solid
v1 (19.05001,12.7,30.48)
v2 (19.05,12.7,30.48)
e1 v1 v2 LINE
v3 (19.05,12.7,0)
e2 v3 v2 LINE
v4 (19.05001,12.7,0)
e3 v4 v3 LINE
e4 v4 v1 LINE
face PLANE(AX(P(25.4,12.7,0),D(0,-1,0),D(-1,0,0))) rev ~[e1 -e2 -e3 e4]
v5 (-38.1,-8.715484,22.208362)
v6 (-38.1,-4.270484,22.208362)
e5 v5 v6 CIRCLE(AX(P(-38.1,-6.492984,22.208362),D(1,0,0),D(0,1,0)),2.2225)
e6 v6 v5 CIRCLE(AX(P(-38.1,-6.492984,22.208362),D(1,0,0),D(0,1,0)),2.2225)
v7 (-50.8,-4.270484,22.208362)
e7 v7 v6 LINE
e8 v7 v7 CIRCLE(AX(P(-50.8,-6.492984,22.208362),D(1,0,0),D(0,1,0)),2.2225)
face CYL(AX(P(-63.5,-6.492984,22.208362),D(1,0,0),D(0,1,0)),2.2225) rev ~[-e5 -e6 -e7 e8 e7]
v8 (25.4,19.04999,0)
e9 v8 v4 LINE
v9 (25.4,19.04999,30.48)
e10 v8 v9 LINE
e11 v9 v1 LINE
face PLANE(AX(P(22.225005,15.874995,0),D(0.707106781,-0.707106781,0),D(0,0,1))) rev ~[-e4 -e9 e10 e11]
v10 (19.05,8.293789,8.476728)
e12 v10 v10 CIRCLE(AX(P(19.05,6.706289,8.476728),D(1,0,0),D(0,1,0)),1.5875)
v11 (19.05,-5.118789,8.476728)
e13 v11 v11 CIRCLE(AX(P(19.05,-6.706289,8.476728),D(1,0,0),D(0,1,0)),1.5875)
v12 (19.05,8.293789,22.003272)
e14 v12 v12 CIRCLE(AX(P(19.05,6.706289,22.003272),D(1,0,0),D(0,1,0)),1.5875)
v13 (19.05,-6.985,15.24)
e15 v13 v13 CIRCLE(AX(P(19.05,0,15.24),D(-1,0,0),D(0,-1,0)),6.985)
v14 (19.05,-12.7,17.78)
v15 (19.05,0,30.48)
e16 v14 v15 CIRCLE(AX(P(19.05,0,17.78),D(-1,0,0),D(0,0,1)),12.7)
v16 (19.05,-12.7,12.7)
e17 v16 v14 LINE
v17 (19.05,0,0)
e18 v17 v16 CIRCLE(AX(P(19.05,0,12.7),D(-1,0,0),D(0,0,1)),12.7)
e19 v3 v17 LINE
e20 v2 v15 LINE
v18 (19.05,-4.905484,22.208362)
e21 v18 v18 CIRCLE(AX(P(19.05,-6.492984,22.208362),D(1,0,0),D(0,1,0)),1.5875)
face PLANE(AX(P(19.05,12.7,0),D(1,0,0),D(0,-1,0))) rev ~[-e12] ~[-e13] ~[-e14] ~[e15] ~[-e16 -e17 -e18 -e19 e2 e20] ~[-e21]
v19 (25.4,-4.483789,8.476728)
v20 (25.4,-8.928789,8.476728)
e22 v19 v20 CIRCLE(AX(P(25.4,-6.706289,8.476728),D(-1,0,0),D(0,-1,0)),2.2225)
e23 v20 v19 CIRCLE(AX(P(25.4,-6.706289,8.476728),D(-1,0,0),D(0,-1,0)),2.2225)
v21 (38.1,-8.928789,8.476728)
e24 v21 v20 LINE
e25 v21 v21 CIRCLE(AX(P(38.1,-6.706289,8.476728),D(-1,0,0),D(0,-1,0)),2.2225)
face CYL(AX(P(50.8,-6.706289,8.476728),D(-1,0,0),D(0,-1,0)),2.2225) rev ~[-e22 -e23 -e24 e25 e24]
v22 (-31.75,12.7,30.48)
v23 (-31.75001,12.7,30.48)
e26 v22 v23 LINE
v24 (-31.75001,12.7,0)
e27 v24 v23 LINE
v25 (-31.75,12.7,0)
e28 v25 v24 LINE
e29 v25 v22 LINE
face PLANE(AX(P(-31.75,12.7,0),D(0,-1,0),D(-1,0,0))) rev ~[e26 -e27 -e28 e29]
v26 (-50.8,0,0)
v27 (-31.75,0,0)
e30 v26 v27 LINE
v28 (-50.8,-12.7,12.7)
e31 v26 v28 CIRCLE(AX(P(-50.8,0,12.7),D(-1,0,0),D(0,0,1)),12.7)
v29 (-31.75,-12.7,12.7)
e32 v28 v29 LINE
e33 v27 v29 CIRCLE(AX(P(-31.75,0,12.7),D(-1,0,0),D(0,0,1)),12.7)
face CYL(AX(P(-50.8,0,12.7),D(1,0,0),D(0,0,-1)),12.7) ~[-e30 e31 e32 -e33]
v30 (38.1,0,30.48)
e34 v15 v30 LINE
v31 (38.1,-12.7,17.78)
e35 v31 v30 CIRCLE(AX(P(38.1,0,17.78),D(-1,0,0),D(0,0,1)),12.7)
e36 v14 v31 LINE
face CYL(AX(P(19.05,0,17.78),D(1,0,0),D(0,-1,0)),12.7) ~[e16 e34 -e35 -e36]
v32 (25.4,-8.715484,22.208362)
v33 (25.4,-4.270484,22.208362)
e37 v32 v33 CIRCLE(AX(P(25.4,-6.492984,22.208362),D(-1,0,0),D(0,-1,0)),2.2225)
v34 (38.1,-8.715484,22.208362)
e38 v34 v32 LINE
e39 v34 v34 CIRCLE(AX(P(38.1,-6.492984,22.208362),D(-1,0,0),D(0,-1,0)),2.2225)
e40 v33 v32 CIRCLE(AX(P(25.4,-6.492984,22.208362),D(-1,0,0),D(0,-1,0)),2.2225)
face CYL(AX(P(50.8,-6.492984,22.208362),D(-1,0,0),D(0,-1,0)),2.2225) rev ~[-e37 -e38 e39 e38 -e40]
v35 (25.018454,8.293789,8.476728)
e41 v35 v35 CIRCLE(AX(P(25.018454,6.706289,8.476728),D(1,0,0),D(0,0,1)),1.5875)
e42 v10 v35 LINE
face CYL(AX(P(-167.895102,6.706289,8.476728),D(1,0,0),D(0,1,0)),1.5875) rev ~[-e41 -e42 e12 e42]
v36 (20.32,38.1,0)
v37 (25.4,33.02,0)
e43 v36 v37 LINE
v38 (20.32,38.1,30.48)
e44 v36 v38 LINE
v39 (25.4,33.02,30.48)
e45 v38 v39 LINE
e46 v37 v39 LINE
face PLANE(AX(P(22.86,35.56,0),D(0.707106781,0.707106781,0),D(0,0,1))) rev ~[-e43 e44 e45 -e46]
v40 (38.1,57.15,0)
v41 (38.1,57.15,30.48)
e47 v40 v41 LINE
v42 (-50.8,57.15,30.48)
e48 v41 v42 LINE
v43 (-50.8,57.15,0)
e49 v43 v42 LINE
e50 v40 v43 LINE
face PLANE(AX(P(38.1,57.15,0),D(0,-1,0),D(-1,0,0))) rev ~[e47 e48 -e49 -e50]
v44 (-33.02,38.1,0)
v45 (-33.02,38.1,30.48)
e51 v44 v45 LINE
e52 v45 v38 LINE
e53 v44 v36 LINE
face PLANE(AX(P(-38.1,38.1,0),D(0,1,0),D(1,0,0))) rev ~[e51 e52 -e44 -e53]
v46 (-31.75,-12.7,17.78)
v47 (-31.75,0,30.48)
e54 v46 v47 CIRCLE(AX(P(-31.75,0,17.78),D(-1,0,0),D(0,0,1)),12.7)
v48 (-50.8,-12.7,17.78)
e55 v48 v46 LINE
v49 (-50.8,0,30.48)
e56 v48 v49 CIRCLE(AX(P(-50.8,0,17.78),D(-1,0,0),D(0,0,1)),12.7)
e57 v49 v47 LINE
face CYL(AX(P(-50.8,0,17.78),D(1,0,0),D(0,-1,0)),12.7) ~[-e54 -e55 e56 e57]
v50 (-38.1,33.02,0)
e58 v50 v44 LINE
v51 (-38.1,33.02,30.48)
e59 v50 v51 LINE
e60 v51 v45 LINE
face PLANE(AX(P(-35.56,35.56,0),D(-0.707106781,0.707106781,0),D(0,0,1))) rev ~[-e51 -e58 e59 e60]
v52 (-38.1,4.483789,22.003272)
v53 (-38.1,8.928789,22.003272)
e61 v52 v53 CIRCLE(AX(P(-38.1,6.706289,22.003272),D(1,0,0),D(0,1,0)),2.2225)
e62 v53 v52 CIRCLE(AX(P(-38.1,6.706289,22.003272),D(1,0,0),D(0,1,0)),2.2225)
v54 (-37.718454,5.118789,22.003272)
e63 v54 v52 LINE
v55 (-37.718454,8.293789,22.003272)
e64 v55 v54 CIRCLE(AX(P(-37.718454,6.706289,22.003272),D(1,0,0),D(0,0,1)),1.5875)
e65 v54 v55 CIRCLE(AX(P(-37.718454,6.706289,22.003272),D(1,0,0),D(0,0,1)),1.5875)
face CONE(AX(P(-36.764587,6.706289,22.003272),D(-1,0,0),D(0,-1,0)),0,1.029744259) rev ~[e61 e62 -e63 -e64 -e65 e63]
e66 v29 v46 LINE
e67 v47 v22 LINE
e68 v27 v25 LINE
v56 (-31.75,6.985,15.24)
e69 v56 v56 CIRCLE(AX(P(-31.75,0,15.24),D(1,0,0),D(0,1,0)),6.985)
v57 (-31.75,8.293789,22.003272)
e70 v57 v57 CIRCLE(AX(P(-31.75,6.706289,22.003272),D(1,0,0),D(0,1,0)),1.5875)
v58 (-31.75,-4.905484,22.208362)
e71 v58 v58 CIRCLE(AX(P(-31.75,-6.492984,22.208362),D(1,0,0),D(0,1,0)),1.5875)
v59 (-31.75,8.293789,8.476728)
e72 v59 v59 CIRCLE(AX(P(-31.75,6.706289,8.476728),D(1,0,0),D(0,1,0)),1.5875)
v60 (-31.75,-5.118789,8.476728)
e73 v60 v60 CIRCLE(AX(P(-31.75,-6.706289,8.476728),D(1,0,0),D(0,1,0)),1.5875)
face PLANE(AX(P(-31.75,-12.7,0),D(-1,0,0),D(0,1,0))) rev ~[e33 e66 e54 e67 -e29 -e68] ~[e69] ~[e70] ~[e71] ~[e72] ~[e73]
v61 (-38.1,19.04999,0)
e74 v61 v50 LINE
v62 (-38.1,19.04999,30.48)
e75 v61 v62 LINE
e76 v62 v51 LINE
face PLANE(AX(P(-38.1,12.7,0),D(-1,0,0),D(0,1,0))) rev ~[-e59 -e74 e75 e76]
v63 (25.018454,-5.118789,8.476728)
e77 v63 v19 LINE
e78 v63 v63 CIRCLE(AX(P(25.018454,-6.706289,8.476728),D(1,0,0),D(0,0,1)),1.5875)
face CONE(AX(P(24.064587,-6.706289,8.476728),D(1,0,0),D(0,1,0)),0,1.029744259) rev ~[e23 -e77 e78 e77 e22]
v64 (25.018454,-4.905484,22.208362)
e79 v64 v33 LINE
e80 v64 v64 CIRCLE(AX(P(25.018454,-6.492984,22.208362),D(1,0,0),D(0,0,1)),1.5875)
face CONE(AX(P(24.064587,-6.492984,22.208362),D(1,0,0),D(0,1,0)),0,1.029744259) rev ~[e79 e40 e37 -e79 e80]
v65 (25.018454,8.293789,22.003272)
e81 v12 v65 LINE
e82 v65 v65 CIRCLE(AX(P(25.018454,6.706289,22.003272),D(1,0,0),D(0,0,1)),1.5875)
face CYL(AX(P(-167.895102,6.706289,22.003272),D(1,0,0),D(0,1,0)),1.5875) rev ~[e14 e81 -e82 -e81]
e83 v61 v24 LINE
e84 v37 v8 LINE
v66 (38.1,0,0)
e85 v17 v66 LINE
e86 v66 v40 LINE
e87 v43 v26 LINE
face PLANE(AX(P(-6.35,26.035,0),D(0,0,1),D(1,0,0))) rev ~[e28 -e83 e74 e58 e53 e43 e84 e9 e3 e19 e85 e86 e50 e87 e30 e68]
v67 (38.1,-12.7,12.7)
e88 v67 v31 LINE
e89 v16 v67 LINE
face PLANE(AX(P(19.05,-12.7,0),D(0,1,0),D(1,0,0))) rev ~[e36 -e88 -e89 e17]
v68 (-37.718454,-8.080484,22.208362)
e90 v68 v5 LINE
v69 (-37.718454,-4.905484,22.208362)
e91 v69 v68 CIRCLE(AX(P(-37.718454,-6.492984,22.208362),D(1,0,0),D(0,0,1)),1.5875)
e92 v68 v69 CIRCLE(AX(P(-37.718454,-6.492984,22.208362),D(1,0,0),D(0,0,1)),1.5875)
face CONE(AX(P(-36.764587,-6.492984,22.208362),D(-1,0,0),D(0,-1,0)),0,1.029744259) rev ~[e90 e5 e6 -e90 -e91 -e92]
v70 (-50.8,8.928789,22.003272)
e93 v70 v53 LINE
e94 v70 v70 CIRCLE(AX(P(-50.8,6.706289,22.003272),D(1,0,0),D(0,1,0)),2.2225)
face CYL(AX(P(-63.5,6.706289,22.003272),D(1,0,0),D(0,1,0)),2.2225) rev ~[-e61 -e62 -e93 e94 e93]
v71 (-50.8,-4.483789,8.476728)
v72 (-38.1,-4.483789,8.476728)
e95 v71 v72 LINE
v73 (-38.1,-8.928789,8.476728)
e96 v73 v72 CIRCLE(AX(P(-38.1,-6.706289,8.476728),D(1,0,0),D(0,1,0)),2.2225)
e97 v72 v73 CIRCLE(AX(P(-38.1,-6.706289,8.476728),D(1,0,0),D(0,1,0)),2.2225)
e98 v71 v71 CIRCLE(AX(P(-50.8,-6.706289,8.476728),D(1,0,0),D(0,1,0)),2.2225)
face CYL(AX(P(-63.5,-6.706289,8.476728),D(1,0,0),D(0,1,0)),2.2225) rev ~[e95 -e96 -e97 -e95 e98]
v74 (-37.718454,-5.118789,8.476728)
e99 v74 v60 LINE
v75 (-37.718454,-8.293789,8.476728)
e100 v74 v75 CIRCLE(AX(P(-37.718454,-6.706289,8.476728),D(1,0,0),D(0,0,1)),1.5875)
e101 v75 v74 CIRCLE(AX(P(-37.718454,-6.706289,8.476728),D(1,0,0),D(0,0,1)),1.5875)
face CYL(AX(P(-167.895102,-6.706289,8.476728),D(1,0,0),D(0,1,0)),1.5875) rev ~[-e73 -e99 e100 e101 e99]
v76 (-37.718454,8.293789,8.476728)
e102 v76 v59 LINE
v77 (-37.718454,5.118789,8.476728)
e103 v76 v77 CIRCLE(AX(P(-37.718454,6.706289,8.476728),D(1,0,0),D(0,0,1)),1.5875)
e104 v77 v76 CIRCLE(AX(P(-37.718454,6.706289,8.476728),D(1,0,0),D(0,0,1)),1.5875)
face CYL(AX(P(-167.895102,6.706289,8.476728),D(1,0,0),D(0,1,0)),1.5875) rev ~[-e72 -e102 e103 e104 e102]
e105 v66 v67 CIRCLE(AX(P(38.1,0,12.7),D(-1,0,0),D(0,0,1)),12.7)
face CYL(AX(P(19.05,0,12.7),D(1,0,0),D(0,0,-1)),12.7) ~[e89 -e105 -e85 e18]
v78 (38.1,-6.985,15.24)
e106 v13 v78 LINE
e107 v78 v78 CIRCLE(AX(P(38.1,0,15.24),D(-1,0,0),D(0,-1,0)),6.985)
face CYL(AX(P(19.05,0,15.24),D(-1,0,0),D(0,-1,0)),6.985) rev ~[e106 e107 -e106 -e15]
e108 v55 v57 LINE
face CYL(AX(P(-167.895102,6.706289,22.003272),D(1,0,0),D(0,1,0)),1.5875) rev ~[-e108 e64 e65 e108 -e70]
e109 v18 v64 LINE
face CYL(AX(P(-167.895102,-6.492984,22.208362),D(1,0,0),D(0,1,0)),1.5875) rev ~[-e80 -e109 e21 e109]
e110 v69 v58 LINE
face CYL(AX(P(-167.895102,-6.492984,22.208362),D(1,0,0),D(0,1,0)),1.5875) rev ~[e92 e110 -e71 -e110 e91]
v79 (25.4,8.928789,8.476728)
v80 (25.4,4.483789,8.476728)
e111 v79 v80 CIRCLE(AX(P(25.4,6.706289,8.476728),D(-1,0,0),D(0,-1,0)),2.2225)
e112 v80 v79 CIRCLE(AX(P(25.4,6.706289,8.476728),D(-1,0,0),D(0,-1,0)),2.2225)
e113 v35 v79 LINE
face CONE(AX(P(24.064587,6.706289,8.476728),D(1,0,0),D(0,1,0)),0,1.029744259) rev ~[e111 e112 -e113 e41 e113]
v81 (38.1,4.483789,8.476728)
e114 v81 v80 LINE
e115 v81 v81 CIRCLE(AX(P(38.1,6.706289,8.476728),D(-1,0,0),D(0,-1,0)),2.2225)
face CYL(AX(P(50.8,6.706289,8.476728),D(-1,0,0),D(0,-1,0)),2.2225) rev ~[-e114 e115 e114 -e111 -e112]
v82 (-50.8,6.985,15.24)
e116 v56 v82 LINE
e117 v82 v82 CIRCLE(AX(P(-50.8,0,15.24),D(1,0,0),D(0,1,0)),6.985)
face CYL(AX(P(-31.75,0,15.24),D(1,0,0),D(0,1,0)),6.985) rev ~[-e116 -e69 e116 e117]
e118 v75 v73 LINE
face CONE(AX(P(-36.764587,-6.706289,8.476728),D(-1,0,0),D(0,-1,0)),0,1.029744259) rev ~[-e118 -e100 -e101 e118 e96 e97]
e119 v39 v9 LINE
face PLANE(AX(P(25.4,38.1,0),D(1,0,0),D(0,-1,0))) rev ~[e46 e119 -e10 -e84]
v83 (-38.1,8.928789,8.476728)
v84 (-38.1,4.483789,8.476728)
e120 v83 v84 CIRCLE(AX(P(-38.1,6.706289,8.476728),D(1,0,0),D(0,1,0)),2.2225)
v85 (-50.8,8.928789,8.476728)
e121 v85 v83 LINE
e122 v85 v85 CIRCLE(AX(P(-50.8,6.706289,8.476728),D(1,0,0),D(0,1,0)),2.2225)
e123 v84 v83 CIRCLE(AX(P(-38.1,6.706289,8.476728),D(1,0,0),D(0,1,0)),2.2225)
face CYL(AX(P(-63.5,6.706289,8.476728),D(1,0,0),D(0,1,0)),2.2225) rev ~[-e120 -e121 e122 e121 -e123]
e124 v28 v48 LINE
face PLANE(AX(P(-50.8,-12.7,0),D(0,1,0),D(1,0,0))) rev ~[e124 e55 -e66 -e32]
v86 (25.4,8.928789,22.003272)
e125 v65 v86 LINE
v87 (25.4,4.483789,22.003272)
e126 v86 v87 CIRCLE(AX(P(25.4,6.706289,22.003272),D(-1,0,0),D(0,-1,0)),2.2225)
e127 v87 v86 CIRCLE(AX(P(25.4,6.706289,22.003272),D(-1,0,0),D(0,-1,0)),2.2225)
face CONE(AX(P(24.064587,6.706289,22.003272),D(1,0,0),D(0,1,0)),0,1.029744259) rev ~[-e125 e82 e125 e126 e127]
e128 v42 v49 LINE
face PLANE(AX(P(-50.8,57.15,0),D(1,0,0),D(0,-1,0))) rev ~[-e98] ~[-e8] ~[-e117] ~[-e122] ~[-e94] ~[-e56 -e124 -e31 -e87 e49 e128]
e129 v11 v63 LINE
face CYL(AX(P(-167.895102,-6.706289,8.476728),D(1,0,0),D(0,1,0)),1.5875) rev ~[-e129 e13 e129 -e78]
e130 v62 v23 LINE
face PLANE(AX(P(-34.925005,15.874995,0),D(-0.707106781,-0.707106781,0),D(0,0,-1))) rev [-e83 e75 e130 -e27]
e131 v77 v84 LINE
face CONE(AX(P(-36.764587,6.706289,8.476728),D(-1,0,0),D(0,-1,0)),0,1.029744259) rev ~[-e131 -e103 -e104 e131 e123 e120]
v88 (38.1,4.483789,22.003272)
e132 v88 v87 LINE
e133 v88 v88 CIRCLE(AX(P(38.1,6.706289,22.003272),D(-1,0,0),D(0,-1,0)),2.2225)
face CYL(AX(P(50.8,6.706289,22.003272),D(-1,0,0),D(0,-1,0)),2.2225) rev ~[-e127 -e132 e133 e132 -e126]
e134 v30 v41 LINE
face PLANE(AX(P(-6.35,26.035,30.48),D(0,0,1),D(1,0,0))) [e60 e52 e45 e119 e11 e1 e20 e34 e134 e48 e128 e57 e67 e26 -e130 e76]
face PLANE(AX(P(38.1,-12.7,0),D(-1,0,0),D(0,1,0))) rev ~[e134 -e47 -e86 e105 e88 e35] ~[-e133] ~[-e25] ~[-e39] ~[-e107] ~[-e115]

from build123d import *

# Parameters (mm, degrees)
F1_DEPTH       = 30.48
F4_D           = 13.97
F4_DEPTH       = 19.051
F4_ON_F2_D     = 13.97
F4_ON_F2_DEPTH = 19.051
F6_D           = 3.175
F8_SIZE        = 5.08
F9_SIZE        = 6.34999
F10_D          = 4.445
F10_DEPTH      = 12.7
F10_TIP        = 1.3354127258
F12_D          = 4.445
F12_DEPTH      = 12.7
F12_TIP        = 1.3354127258
F13_R          = 12.7


# Not quite as in the source:
# - a fillet or chamfer is up to 0.001 mm smaller than in the source, because OpenCascade refuses the exact size
# - a feature names something its author has since deleted; it is built from what else it names


with BuildPart() as f1:
    # F0 (on Top) → F1 (new body)
    with BuildSketch(Plane.XY):
        Polygon((38.1, 57.15), (-50.8, 57.15), (-50.8, -12.7), (-31.75, -12.7), (-31.75, 12.7), (-38.1, 12.7), (-38.1, 38.1), (25.4, 38.1), (25.4, 12.7), (19.05, 12.7), (19.05, -12.7), (38.1, -12.7), align=None)
    extrude(amount=F1_DEPTH)

    # F4 (through all, one way)
    with BuildSketch(Plane(origin=(19.05, 0, 0), x_dir=(0, -1, 0), z_dir=(-1, 0, 0))):
        with Locations((0, 15.24)):
            Circle(F4_D / 2)
    extrude(amount=-F4_DEPTH, mode=Mode.SUBTRACT)

    # F4 on F2 (through all, one way)
    with BuildSketch(Plane.YZ.offset(-31.75)):
        with Locations((0, 15.24)):
            Circle(F4_ON_F2_D / 2)
    extrude(amount=-F4_ON_F2_DEPTH, mode=Mode.SUBTRACT)

    # F6 (through all)
    with Locations(Plane(origin=(-50.8, 0, 0), x_dir=(0, -1, 0), z_dir=(-1, 0, 0))):
        with Locations((-6.706288951, 22.003272388), (6.4929844043, 22.2083615897), (6.706288951, 8.476727612), (-6.706288951, 8.476727612)):
            Hole(F6_D / 2)

    # F8
    f8_edges = [f1.edges().sort_by_distance(p)[0] for p in [
        (-38.1, 38.1, 15.24),
        (25.4, 38.1, 15.24),
    ]]
    chamfer(f8_edges, length=F8_SIZE)

    # F9 (size 6.35 in the source; OpenCascade refuses exactly that, so slightly less here)
    f9_edges = [f1.edges().sort_by_distance(p)[0] for p in [
        (25.4, 12.7, 15.24),
        (-38.1, 12.7, 15.24),
    ]]
    chamfer(f9_edges, length=F9_SIZE)

    # F10
    with Locations(Plane(origin=(-50.8, 0, 0), x_dir=(0, -1, 0), z_dir=(-1, 0, 0))):
        with Locations((6.4929844043, 22.2083615897), (6.706288951, 8.476727612), (-6.706288951, 8.476727612), (-6.706288951, 22.003272388)):
            Hole(F10_D / 2, depth=F10_DEPTH)
            with Locations((0, 0, -(F10_DEPTH + F10_TIP / 2))):  # 118° drill point
                Cone(0, F10_D / 2, F10_TIP, mode=Mode.SUBTRACT)

    # F12
    with Locations(Plane.YZ.offset(38.1)):
        with Locations((-6.706288951, 8.476727612), (-6.4929844043, 22.2083615897), (6.706288951, 22.003272388), (6.706288951, 8.476727612)):
            Hole(F12_D / 2, depth=F12_DEPTH)
            with Locations((0, 0, -(F12_DEPTH + F12_TIP / 2))):  # 118° drill point
                Cone(0, F12_D / 2, F12_TIP, mode=Mode.SUBTRACT)

    # F13
    f13_edges = [f1.edges().sort_by_distance(p)[0] for p in [
        (-41.275, -12.7, 30.48),
        (28.575, -12.7, 30.48),
        (28.575, -12.7, 0),
        (-41.275, -12.7, 0),
    ]]
    fillet(f13_edges, radius=F13_R)


solid = f1.part
